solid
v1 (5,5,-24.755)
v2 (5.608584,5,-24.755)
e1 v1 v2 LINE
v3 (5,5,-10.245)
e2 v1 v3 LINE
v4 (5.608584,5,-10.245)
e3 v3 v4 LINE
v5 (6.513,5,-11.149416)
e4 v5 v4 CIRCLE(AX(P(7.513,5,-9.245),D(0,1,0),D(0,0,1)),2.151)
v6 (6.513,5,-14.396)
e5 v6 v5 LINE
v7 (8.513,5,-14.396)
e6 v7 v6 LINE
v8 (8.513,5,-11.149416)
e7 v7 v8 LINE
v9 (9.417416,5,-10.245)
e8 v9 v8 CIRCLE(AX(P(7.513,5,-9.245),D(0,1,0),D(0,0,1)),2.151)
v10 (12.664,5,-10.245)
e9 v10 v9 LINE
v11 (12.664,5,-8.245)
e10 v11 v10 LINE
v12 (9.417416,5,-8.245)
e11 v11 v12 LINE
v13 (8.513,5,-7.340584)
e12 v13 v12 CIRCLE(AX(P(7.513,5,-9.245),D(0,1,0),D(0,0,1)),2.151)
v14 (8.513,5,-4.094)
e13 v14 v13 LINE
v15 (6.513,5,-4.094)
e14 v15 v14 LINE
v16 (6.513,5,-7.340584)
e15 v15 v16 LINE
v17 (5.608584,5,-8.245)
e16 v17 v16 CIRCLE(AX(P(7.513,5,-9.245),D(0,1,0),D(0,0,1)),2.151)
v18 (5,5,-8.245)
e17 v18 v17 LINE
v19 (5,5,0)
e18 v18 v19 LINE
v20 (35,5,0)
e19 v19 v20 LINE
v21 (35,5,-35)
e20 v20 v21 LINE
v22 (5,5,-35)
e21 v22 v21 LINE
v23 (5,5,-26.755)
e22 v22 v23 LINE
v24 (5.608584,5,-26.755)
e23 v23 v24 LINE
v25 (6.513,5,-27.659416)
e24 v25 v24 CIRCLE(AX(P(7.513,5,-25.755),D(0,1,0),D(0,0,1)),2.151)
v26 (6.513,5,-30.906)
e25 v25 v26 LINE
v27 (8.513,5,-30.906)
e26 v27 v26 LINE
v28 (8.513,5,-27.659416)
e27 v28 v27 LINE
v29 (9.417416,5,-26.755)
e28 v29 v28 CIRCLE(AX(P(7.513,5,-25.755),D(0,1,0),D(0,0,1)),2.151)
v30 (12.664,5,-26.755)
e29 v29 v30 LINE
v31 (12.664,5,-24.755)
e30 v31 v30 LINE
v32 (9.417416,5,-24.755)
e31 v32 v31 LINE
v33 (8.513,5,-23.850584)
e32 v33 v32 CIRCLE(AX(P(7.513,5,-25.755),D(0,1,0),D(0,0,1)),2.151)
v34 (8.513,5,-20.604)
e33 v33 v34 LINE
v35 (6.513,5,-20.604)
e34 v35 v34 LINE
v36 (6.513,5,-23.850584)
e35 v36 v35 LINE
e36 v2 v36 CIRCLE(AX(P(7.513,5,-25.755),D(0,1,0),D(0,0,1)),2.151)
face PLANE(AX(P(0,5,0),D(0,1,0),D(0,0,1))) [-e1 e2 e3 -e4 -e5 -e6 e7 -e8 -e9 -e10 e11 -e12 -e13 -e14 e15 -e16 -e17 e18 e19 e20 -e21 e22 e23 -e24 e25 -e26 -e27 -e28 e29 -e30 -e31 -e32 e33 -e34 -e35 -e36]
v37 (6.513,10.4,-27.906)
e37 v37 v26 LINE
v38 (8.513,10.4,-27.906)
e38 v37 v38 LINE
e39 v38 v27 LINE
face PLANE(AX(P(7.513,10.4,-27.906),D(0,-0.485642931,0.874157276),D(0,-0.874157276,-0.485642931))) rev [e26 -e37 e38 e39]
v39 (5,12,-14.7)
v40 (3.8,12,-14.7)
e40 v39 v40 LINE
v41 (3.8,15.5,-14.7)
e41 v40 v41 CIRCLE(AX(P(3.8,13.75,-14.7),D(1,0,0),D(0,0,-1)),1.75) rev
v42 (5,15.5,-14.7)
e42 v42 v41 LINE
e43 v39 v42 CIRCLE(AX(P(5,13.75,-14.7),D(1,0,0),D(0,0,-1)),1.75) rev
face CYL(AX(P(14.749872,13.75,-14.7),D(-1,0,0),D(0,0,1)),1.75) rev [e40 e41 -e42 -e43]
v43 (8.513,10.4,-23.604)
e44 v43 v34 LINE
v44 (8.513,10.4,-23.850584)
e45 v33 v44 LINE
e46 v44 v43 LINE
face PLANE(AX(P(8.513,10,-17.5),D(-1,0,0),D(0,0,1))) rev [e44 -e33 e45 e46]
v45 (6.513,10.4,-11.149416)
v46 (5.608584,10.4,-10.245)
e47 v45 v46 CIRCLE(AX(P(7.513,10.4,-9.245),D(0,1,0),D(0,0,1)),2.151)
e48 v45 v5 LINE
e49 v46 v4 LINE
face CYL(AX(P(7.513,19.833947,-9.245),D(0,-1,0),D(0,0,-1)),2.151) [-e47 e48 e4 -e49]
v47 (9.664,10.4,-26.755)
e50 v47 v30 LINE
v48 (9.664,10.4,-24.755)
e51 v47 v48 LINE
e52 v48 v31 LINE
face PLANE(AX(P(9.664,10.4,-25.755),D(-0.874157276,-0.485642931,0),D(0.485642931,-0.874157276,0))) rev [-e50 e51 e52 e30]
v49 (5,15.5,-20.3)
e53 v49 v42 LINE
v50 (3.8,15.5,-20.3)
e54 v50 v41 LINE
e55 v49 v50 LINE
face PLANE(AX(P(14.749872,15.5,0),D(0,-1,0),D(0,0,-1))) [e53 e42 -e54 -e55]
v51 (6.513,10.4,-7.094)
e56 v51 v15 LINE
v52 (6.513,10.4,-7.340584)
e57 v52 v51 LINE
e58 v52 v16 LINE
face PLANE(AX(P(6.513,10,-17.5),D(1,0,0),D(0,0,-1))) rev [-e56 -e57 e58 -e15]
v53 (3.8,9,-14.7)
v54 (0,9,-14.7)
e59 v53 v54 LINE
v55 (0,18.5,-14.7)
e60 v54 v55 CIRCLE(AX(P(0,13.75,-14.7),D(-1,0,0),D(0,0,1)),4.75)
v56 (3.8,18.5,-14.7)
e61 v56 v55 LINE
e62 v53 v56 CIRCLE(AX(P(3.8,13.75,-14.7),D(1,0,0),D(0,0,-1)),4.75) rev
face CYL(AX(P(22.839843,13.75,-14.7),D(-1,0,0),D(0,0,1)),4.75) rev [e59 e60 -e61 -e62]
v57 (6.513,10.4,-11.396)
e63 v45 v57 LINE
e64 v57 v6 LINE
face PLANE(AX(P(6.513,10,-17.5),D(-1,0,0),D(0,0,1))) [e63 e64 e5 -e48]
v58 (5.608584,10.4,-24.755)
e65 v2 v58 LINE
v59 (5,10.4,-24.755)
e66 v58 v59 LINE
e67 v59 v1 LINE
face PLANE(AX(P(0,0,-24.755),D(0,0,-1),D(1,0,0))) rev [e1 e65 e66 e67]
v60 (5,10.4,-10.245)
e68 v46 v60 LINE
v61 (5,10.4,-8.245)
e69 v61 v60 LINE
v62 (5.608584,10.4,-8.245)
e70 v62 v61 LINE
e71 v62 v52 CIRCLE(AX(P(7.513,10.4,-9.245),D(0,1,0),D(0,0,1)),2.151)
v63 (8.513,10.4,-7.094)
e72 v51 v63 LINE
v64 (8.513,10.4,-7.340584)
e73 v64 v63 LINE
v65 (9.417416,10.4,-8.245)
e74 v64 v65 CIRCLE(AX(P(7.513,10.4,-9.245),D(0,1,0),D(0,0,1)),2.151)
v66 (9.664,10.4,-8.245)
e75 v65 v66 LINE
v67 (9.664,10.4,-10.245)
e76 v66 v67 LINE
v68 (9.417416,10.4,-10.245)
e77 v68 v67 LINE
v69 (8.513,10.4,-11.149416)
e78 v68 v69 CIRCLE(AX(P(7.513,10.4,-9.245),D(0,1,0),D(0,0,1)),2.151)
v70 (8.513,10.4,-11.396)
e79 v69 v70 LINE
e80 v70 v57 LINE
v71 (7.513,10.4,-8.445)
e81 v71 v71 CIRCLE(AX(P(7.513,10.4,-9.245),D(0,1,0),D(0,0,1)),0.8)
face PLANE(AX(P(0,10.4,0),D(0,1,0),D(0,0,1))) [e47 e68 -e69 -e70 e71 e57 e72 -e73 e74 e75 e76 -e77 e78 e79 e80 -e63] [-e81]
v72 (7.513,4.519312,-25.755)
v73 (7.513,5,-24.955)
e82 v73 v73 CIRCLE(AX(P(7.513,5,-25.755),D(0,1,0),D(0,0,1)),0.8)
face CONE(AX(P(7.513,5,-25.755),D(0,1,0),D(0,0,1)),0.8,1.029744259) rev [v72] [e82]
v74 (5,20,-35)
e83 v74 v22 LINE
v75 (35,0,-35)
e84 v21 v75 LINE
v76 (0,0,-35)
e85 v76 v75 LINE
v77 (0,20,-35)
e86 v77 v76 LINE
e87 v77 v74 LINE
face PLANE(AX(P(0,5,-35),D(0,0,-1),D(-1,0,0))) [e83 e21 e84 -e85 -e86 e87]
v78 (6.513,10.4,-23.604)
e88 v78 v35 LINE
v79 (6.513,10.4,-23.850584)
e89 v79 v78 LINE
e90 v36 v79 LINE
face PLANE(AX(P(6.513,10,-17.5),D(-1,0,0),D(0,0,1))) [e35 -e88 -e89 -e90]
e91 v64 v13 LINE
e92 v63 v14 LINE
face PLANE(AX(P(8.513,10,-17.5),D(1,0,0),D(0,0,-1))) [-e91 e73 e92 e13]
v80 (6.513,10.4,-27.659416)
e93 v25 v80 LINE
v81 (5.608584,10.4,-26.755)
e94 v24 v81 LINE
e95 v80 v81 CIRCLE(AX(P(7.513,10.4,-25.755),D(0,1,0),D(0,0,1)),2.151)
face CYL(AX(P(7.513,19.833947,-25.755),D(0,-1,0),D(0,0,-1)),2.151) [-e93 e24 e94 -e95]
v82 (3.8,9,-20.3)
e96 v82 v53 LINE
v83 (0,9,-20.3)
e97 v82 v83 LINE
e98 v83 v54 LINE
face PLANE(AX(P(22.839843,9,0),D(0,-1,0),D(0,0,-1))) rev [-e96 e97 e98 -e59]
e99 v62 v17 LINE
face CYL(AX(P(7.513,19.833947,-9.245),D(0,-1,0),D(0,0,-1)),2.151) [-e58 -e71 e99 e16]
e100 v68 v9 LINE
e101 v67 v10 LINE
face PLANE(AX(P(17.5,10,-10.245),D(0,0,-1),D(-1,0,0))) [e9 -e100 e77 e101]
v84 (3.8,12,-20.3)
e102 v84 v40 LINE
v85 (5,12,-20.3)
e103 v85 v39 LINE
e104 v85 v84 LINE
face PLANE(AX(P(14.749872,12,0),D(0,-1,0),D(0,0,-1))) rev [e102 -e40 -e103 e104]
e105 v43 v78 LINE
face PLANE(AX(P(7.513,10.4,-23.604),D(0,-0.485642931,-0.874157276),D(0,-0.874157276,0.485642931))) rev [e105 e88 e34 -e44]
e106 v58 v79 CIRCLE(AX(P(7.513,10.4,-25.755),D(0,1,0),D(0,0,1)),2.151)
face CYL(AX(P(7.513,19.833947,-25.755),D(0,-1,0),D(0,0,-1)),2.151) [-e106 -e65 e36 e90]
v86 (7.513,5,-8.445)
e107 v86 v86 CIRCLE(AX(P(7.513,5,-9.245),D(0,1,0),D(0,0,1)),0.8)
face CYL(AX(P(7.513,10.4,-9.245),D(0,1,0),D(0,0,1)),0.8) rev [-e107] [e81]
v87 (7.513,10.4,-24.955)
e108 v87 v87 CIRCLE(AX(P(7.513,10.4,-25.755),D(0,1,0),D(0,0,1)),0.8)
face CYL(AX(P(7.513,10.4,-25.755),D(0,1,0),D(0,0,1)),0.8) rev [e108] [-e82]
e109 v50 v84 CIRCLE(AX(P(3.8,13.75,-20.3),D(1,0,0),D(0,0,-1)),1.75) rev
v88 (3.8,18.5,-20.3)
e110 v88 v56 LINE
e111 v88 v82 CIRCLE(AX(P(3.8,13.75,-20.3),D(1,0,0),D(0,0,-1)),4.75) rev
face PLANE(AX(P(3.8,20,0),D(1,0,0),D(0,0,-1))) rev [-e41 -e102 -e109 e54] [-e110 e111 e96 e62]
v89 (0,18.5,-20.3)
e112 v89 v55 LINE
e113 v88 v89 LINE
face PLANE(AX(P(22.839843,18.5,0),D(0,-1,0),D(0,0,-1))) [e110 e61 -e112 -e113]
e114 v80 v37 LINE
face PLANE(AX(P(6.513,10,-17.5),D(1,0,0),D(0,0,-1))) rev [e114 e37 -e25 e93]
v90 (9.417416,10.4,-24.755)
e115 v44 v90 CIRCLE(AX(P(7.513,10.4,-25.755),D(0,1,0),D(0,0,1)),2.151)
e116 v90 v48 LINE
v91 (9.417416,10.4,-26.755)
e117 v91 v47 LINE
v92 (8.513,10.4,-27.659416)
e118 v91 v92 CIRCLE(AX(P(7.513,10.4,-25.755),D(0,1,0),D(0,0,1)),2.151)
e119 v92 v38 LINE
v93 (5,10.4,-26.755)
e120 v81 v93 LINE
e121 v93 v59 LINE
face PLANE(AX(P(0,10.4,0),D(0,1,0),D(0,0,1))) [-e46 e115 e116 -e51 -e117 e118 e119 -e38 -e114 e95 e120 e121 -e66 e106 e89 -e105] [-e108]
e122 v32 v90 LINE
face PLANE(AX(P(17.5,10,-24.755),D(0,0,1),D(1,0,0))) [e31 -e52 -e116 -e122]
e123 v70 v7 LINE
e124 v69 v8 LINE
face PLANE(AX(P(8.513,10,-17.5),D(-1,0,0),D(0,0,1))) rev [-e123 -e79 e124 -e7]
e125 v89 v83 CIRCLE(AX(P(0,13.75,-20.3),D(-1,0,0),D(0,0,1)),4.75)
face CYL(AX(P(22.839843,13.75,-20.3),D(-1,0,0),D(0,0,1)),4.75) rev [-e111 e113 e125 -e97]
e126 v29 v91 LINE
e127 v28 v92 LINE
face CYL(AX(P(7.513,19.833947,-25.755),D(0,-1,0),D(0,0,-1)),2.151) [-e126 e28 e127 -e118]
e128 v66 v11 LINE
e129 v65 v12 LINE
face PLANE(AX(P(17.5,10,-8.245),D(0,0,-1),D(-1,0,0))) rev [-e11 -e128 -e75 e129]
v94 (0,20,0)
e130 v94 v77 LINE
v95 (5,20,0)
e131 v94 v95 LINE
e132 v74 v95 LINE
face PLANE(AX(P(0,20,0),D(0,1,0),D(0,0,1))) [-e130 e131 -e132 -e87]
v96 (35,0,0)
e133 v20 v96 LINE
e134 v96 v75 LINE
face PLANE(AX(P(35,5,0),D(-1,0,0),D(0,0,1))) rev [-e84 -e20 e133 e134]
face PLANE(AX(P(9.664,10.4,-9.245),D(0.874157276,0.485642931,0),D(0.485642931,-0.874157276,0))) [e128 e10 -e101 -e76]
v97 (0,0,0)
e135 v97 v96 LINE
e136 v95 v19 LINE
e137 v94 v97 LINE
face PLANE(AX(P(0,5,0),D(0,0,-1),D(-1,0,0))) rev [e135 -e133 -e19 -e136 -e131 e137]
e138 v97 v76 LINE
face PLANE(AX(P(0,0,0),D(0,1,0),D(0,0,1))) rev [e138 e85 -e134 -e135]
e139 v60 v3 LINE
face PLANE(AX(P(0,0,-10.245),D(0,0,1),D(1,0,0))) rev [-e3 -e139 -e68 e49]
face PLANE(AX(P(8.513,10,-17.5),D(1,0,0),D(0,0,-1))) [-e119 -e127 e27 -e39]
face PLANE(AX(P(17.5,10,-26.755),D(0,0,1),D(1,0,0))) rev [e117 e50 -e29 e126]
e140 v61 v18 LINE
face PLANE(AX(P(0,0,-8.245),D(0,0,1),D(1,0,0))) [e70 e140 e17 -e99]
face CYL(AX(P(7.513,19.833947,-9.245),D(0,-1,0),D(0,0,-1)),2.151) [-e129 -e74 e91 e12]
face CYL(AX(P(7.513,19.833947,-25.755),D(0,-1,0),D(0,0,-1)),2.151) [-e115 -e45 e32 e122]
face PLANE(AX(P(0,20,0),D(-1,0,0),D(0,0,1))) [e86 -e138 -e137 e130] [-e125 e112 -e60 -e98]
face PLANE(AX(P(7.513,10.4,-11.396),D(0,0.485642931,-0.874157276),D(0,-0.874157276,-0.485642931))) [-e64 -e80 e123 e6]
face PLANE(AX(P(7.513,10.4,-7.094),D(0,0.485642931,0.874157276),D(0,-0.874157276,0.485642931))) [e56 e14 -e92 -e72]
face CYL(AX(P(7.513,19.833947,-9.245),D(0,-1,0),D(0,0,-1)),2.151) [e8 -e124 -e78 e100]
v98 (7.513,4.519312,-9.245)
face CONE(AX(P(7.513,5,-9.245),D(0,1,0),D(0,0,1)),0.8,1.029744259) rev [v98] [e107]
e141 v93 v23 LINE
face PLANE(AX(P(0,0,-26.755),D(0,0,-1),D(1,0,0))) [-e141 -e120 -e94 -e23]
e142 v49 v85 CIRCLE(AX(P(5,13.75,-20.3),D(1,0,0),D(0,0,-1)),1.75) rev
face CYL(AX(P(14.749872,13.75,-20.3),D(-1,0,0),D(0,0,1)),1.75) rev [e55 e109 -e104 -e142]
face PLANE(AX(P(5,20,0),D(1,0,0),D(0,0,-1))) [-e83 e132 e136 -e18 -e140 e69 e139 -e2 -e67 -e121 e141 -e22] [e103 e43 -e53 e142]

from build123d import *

# Parameters (mm, degrees)
SKETCH1_W             = 30
SKETCH1_H             = 35
BOSS_EXTRUDE1_DEPTH   = 5
SKETCH1_3_W           = 5
SKETCH1_3_H           = 35
BOSS_EXTRUDE2_DEPTH   = 20
CUT_EXTRUDE1_DEPTH    = 5
CUT_EXTRUDE2_DEPTH    = 3.8
SKETCH3_R             = 2.151
BOSS_EXTRUDE3_DEPTH   = 5.4
RIB1_START            = -1
RIB1_DEPTH            = 2
CIRPATTERN6_COUNT     = 4
SKETCH6_W             = 5.4
SKETCH6_H             = 0.862
BOSS_EXTRUDE4_DEPTH   = 1
MIRROR1_START         = -1
MIRROR1_COPY_1_DEPTH  = 2
MIRROR1_COPY_2_DEPTH  = 2
M2_TAPPED_HOLE1_D     = 1.6
M2_TAPPED_HOLE1_DEPTH = 5.4
M2_TAPPED_HOLE1_TIP   = 0.480688495


with BuildPart() as part:
    # Sketch1 → Boss-Extrude1 (new body)
    with BuildSketch(Plane(origin=(0, 0, 0), x_dir=(1, 0, 0), z_dir=(0, 1, 0))):
        with Locations((20, 17.5)):
            Rectangle(SKETCH1_W, SKETCH1_H)
    extrude(amount=BOSS_EXTRUDE1_DEPTH)

    # Sketch1<3> → Boss-Extrude2 (add)
    with BuildSketch(Plane(origin=(0, 0, 0), x_dir=(1, 0, 0), z_dir=(0, 1, 0))):
        with Locations((2.5, 17.5)):
            Rectangle(SKETCH1_3_W, SKETCH1_3_H)
    extrude(amount=BOSS_EXTRUDE2_DEPTH)

    # Sketch2 → Cut-Extrude1 (cut)
    with BuildSketch(Plane.ZY):
        with BuildLine():
            Line((-20.3, 12), (-14.7, 12))
            ThreePointArc((-14.7, 12), (-12.95, 13.75), (-14.7, 15.5))
            Line((-14.7, 15.5), (-20.3, 15.5))
            ThreePointArc((-20.3, 15.5), (-22.05, 13.75), (-20.3, 12))
        make_face()
    extrude(amount=-CUT_EXTRUDE1_DEPTH, mode=Mode.SUBTRACT)

    # Sketch2<4> → Cut-Extrude2 (cut)
    with BuildSketch(Plane.ZY):
        with BuildLine():
            Line((-20.3, 18.5), (-14.7, 18.5))
            ThreePointArc((-14.7, 18.5), (-9.95, 13.75), (-14.7, 9))
            Line((-14.7, 9), (-20.3, 9))
            ThreePointArc((-20.3, 9), (-25.05, 13.75), (-20.3, 18.5))
        make_face()
        with BuildLine():
            ThreePointArc((-14.7, 12), (-12.95, 13.75), (-14.7, 15.5))
            Line((-14.7, 15.5), (-20.3, 15.5))
            ThreePointArc((-20.3, 15.5), (-22.05, 13.75), (-20.3, 12))
            Line((-20.3, 12), (-14.7, 12))
        make_face(mode=Mode.SUBTRACT)
    extrude(amount=-CUT_EXTRUDE2_DEPTH, mode=Mode.SUBTRACT)

    # Sketch3 → Boss-Extrude3 (add)
    with BuildSketch(Plane(origin=(0, 5, 0), x_dir=(1, 0, 0), z_dir=(0, 1, 0))):
        with Locations(Location((7.513, 25.755, 0), (0, 0, 90))):
            Circle(SKETCH3_R)
        with Locations(Location((7.513, 9.245, 0), (0, 0, 90))):
            Circle(SKETCH3_R)
    extrude(amount=BOSS_EXTRUDE3_DEPTH)

    # Rib1: read off the stored shape, not the designer's step
    # Rib1 outline → Rib1 (add)
    with BuildSketch(Plane(origin=(7.513, 0, 0), x_dir=(0, 0, -1), z_dir=(1, 0, 0)).offset(RIB1_START)):
        Polygon((7.094, 10.4), (4.094, 5), (7.340583816, 5), (7.340583816, 10.4), align=None)
    rib1 = extrude(amount=RIB1_DEPTH)

    # CirPattern6: Rib1 ×4 about axis, 1 skipped
    cirpattern6_axis = Axis((7.513, 0, -9.245), (0, 1, 0))
    add([rib1.rotate(cirpattern6_axis, i * 360 / CIRPATTERN6_COUNT) for i in range(1, CIRPATTERN6_COUNT) if i not in (3,)])

    # Sketch6 → Boss-Extrude4 (add, symmetric)
    with BuildSketch(Plane(origin=(0, 0, -9.245), x_dir=(0, -1, 0), z_dir=(0, 0, 1))):
        with Locations((-7.7, 5.431)):
            Rectangle(SKETCH6_W, SKETCH6_H)
    boss_extrude4 = extrude(amount=BOSS_EXTRUDE4_DEPTH, both=True)

    # Mirror1: Rib1, Boss-Extrude4 across plane
    add(rib1.mirror(Plane.XY.offset(-17.5)))
    add(boss_extrude4.mirror(Plane.XY.offset(-17.5)))

    # Mirror1 copy 1 sketch → Mirror1 copy 1 (add)
    with BuildSketch(Plane(origin=(16.758, 0, -25.755), x_dir=(-1, 0, 0), z_dir=(0, 0, 1)).offset(MIRROR1_START)):
        Polygon((7.094, -10.4), (4.094, -5), (7.340583816, -5), (7.340583816, -10.4), align=None)
    extrude(amount=MIRROR1_COPY_1_DEPTH)

    # Mirror1 copy 2 sketch → Mirror1 copy 2 (add)
    with BuildSketch(Plane(origin=(7.513, 0, -16.51), x_dir=(0, 0, -1), z_dir=(-1, 0, 0)).offset(MIRROR1_START)):
        Polygon((7.094, -10.4), (4.094, -5), (7.340583816, -5), (7.340583816, -10.4), align=None)
    extrude(amount=MIRROR1_COPY_2_DEPTH)

    # M2 Tapped Hole1
    with Locations(Plane(origin=(0, 10.4, 0), x_dir=(1, 0, 0), z_dir=(0, 1, 0))):
        with Locations((7.513, 9.245), (7.513, 25.755)):
            Hole(M2_TAPPED_HOLE1_D / 2, depth=M2_TAPPED_HOLE1_DEPTH)
            with Locations((0, 0, -(M2_TAPPED_HOLE1_DEPTH + M2_TAPPED_HOLE1_TIP / 2))):  # 118° drill point
                Cone(0, M2_TAPPED_HOLE1_D / 2, M2_TAPPED_HOLE1_TIP, mode=Mode.SUBTRACT)


solid = part.part
